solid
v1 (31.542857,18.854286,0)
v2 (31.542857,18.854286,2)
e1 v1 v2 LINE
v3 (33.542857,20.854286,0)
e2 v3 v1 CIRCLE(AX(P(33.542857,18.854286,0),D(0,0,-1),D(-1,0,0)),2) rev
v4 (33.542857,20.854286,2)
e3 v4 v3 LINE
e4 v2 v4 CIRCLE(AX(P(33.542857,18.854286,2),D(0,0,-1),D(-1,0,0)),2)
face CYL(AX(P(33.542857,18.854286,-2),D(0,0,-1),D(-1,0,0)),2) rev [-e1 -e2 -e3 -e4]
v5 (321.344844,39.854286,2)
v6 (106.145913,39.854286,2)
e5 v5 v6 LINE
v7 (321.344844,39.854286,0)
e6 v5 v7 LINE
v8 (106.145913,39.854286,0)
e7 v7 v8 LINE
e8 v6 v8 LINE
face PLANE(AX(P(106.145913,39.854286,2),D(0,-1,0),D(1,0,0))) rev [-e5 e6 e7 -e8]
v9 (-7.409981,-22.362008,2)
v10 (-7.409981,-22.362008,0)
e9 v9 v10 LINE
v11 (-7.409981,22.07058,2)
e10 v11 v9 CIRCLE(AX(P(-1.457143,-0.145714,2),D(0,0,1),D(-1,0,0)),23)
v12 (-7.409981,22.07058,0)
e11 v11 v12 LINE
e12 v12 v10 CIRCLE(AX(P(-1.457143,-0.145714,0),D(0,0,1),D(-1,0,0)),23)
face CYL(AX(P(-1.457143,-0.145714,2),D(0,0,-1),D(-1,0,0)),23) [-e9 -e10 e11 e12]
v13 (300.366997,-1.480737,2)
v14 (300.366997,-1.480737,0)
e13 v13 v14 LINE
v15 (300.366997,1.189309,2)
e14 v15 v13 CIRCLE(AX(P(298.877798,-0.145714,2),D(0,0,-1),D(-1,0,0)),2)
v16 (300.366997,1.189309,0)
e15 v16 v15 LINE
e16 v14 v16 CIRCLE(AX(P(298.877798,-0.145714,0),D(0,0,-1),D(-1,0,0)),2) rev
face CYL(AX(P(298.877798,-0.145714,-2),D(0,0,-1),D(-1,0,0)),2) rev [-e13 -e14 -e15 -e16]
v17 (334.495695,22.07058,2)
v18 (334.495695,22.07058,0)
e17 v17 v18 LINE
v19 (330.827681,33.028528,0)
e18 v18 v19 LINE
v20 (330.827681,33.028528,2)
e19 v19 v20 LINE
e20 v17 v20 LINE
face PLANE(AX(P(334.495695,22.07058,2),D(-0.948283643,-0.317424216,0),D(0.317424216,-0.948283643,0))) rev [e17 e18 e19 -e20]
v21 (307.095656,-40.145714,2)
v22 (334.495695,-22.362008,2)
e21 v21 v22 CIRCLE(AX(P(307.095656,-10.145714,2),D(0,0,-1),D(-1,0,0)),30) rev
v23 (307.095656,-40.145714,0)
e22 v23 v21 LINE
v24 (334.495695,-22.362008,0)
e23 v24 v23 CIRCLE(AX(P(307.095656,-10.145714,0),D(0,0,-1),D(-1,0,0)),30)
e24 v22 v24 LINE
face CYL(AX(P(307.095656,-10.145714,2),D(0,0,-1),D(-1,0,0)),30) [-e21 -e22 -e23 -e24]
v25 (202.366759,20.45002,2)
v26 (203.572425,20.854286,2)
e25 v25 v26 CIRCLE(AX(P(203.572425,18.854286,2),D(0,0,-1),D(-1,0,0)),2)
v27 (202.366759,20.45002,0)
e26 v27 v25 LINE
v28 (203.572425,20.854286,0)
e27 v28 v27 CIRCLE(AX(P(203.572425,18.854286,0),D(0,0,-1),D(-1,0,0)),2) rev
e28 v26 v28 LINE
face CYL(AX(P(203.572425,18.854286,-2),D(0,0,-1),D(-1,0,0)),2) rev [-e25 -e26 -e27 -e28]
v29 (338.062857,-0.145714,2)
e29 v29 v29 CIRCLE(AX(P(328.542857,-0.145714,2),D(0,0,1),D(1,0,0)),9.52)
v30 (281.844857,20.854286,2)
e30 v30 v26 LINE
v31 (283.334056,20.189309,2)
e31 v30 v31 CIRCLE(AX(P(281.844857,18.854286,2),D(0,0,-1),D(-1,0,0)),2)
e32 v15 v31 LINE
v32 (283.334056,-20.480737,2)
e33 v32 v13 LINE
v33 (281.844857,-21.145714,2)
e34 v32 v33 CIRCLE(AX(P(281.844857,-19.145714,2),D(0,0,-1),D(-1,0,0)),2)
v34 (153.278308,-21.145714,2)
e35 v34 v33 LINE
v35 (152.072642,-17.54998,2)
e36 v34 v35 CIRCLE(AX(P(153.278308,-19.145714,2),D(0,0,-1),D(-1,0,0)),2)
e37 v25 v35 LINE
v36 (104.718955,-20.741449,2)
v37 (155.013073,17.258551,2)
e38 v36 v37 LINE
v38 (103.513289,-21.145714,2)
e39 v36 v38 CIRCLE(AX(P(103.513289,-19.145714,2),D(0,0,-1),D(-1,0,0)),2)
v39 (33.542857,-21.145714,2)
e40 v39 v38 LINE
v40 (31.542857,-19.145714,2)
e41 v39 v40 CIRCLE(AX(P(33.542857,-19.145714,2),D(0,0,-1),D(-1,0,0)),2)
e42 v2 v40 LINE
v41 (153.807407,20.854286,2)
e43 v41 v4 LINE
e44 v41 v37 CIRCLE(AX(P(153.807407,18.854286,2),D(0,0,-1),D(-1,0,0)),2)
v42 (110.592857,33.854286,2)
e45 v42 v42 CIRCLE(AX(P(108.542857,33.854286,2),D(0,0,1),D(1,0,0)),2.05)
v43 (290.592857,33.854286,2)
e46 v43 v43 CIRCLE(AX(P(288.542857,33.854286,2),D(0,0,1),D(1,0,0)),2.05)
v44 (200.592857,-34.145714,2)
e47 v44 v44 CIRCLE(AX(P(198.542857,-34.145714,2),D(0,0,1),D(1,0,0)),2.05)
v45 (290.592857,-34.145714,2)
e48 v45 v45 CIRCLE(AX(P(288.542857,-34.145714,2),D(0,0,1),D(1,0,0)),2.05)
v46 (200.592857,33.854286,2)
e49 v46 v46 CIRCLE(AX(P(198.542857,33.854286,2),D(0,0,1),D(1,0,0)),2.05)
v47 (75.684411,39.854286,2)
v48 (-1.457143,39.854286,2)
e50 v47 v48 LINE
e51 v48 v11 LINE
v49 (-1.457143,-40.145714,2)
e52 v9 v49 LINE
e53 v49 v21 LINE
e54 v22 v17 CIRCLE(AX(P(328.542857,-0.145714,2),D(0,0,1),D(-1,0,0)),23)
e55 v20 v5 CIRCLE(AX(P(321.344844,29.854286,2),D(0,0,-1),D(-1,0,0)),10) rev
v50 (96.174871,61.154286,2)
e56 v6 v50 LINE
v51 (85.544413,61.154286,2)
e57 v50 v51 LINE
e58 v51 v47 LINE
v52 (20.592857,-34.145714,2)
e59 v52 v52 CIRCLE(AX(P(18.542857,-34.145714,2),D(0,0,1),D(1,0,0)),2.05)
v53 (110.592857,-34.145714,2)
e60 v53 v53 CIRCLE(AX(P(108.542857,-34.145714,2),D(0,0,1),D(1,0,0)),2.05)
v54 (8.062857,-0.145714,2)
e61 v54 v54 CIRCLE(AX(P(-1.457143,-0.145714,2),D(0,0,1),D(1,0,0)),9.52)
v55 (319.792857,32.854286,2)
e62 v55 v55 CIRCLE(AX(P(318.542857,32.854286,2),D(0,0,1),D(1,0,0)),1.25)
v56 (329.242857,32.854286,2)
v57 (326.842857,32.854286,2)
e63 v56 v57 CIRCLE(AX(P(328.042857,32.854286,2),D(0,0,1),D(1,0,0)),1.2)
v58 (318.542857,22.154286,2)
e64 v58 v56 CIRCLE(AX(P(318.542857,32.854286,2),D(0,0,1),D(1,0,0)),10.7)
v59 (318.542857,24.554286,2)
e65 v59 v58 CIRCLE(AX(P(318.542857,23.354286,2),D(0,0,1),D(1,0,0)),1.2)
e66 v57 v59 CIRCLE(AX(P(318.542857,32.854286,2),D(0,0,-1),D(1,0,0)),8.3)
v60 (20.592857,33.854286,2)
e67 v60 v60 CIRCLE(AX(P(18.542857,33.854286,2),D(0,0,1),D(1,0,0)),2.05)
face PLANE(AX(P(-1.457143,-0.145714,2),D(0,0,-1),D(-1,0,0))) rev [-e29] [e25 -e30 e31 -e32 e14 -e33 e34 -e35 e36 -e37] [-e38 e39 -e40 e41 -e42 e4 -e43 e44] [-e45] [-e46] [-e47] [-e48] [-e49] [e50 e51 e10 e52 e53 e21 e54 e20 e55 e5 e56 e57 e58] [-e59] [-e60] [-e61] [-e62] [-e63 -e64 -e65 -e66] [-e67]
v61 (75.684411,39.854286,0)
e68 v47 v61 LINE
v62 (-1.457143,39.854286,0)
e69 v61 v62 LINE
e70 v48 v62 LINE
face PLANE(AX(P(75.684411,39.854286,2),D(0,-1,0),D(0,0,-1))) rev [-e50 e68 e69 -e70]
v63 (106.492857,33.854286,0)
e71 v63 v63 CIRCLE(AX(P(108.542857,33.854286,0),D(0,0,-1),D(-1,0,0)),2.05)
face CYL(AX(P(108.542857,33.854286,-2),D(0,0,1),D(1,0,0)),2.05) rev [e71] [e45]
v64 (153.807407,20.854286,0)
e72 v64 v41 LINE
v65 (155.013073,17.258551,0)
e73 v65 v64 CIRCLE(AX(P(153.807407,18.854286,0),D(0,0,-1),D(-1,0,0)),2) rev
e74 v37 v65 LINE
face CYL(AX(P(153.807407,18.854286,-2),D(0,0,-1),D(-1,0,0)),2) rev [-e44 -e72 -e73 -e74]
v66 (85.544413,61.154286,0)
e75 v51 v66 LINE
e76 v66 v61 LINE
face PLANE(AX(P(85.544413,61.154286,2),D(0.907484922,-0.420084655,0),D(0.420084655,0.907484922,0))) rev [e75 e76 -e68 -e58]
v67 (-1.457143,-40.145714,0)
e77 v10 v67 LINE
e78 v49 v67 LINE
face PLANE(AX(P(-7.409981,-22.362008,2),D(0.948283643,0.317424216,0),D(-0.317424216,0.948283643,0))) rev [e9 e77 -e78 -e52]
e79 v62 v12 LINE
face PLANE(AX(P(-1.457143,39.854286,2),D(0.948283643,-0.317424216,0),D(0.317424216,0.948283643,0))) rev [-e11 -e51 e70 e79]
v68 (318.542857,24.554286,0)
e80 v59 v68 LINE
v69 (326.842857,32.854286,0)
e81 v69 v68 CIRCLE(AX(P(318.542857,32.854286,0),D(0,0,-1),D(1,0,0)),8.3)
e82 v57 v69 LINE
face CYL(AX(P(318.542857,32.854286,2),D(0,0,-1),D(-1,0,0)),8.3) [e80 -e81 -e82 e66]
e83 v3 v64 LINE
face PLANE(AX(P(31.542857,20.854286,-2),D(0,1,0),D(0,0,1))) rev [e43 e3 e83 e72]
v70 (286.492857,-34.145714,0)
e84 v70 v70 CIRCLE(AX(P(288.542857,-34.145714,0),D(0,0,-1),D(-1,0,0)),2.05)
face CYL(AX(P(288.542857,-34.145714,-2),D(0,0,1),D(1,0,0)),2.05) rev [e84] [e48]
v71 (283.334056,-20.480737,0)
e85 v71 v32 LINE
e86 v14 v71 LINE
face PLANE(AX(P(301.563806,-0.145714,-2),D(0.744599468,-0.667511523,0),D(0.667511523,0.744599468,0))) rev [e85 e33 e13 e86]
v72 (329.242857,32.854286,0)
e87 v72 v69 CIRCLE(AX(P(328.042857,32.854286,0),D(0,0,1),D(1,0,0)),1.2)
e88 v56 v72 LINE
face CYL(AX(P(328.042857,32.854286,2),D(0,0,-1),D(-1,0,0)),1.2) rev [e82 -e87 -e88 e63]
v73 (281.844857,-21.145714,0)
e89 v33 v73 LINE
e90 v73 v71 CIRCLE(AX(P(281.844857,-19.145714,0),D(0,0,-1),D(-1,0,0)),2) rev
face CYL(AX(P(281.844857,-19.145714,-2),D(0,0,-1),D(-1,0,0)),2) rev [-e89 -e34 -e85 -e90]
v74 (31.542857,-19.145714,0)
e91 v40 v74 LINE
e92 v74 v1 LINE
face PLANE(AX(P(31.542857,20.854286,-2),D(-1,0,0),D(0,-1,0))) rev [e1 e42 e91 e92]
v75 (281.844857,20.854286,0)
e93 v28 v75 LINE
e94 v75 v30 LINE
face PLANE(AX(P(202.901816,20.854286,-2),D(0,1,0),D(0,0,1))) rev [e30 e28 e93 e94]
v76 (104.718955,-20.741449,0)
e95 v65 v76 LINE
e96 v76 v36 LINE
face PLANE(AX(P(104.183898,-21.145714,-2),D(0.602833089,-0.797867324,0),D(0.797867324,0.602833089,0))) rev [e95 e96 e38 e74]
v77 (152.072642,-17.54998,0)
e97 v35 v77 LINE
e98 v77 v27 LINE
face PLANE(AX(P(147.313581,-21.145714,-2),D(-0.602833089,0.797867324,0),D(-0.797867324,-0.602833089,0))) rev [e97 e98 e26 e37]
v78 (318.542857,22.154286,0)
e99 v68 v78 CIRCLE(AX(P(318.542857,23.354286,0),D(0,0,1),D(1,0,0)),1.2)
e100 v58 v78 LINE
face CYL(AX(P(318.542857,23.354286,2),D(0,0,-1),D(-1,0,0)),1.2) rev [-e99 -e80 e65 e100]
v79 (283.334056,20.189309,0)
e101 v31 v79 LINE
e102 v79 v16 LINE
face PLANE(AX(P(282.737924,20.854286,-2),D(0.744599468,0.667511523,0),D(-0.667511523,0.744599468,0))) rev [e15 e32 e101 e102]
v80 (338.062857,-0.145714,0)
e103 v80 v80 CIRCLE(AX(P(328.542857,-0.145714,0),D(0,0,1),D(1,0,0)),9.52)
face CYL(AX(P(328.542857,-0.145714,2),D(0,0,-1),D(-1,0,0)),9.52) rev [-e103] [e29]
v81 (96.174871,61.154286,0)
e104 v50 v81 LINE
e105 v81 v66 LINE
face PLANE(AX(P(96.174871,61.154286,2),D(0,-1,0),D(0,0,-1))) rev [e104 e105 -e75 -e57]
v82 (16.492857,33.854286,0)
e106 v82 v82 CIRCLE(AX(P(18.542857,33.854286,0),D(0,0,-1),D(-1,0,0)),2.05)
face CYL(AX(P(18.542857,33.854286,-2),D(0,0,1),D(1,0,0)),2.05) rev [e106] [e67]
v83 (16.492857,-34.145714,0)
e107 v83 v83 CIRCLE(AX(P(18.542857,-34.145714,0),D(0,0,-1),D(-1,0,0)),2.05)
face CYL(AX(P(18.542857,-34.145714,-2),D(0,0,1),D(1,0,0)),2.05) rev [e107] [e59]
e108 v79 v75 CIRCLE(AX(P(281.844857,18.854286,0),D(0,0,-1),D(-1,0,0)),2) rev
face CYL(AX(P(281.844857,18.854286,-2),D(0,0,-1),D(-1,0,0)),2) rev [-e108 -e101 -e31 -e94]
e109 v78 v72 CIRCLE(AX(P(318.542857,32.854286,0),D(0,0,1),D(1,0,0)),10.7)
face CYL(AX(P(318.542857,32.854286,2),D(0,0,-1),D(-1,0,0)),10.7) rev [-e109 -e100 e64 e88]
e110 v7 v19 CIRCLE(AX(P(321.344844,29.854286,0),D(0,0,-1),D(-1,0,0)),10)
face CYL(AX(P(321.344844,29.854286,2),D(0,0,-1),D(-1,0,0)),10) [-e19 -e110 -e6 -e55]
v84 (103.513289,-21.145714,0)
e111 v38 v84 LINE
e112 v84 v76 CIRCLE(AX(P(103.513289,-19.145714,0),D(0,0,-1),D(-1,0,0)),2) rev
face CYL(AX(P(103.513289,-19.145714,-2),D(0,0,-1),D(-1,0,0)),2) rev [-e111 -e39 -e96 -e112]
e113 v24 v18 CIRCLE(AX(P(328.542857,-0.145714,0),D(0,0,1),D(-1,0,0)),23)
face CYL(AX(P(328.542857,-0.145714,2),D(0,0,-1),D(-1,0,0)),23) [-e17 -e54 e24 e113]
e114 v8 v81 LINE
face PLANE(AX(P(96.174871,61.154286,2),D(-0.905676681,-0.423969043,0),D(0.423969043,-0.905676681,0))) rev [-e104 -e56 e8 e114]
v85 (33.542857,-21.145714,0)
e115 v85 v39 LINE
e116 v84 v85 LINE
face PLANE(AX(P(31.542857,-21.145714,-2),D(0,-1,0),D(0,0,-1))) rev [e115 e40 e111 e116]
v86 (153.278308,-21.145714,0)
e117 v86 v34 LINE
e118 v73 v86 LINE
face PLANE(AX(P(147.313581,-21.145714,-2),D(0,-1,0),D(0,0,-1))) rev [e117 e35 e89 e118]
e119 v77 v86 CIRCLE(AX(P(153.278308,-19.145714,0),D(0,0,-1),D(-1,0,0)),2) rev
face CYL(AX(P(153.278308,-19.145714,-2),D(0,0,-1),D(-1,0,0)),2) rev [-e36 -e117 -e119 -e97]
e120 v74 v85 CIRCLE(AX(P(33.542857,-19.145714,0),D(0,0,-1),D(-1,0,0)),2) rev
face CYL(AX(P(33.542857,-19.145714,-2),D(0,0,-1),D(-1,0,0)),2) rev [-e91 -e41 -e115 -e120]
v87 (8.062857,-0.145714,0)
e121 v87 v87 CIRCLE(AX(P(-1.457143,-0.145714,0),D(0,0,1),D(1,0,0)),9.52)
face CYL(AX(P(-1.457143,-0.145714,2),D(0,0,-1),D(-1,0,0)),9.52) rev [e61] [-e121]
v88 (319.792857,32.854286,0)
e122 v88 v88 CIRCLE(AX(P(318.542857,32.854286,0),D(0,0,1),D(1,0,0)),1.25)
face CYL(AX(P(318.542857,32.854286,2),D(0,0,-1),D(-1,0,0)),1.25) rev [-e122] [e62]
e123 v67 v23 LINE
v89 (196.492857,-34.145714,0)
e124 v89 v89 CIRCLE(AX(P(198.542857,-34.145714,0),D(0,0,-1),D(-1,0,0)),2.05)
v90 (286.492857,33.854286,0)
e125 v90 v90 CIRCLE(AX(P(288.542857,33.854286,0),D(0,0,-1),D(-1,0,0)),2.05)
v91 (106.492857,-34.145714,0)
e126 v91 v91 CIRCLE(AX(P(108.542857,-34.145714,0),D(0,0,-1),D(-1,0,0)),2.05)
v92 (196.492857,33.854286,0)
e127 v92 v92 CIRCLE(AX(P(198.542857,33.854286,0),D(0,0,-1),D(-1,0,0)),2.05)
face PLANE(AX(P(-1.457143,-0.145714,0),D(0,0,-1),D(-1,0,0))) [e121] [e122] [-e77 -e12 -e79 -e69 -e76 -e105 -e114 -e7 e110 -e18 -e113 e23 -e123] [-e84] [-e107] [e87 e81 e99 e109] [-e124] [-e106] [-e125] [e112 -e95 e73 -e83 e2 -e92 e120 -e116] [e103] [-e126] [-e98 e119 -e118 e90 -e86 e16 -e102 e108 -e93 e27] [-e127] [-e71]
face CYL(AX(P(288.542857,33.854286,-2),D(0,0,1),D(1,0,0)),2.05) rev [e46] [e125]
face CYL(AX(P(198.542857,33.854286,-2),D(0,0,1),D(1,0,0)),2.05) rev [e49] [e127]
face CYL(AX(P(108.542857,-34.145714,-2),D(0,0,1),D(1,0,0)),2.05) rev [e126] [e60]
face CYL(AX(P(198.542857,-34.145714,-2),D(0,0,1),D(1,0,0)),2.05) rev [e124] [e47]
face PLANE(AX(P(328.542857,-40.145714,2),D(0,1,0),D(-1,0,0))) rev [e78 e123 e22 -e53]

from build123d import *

# Parameters (mm, degrees)
SKETCH_1_R          = 9.52
SKETCH_1_R_2        = 1.25
EXTRUDE_1_DEPTH     = 2
SKETCH_2_R          = 2.05
CUT_EXTRUDE_1_DEPTH = 4
FILLET_1_R          = 2
FILLET_3_R          = 30
FILLET_6_R          = 10


with BuildPart() as part:
    # 草图1 → 凸台-拉伸1 (new body)
    with BuildSketch(Plane.XY):
        with BuildLine():
            Line((328.542857143, -40.145714286), (-1.457142857, -40.145714286))
            Line((-1.457142857, -40.145714286), (-7.409980895, -22.36200829))
            ThreePointArc((-7.409980895, -22.36200829), (-24.457142857, -0.145714286), (-7.409980895, 22.070579719))
            Line((-7.409980895, 22.070579719), (-1.457142857, 39.854285714))
            Line((-1.457142857, 39.854285714), (75.684411109, 39.854285714))
            Line((75.684411109, 39.854285714), (85.544413109, 61.154285714))
            Line((85.544413109, 61.154285714), (96.174870529, 61.154285714))
            Line((96.174870529, 61.154285714), (106.145912956, 39.854285714))
            Line((106.145912956, 39.854285714), (321.071621128, 39.854285714))
            Line((321.071621128, 39.854285714), (328.542857143, 39.854285714))
            Line((328.542857143, 39.854285714), (334.49569518, 22.070579719))
            ThreePointArc((334.49569518, 22.070579719), (351.542857143, -0.145714286), (334.49569518, -22.36200829))
            Line((334.49569518, -22.36200829), (328.542857143, -40.145714286))
        make_face()
        with Locations((-1.457142857, -0.145714286)):
            Circle(SKETCH_1_R, mode=Mode.SUBTRACT)
        with Locations((328.542857143, -0.145714286)):
            Circle(SKETCH_1_R, mode=Mode.SUBTRACT)
        with Locations((318.542857143, 32.854285714)):
            Circle(SKETCH_1_R_2, mode=Mode.SUBTRACT)
        with BuildLine():
            ThreePointArc((318.542857143, 22.154285714), (326.108899702, 25.288243156), (329.242857143, 32.854285714))
            ThreePointArc((329.242857143, 32.854285714), (328.042857143, 34.054285714), (326.842857143, 32.854285714))
            ThreePointArc((326.842857143, 32.854285714), (324.411843427, 26.98529943), (318.542857143, 24.554285714))
            ThreePointArc((318.542857143, 24.554285714), (317.342857143, 23.354285714), (318.542857143, 22.154285714))
        make_face(mode=Mode.SUBTRACT)
    extrude(amount=EXTRUDE_1_DEPTH)

    # 草图2 → 切除-拉伸1 (cut)
    with BuildSketch(Plane.XY.offset(2)):
        with Locations((108.542857143, 33.854285714)):
            Circle(SKETCH_2_R)
        with Locations((198.542857143, 33.854285714)):
            Circle(SKETCH_2_R)
        with Locations((288.542857143, 33.854285714)):
            Circle(SKETCH_2_R)
        with Locations((108.542857143, -34.145714286)):
            Circle(SKETCH_2_R)
        with Locations((198.542857143, -34.145714286)):
            Circle(SKETCH_2_R)
        with Locations((288.542857143, -34.145714286)):
            Circle(SKETCH_2_R)
        with Locations((18.542857143, -34.145714286)):
            Circle(SKETCH_2_R)
        with Locations((18.542857143, 33.854285714)):
            Circle(SKETCH_2_R)
        Polygon((31.542857143, -21.145714286), (104.183898028, -21.145714286), (159.772133322, 20.854285714), (31.542857143, 20.854285714), align=None)
        Polygon((147.313580964, -21.145714286), (202.901816258, 20.854285714), (282.737923896, 20.854285714), (301.563806249, -0.145714286), (282.737923896, -21.145714286), align=None)
    extrude(amount=-CUT_EXTRUDE_1_DEPTH, mode=Mode.SUBTRACT)

    # 圆角1
    fillet_1_edges = [part.edges().sort_by_distance(p)[0] for p in [
        (202.901816258, 20.854285714, 1),
        (282.737923896, 20.854285714, 1),
        (301.563806249, -0.145714286, 1),
        (31.542857143, -21.145714286, 1),
        (31.542857143, 20.854285714, 1),
        (159.772133322, 20.854285714, 1),
        (104.183898028, -21.145714286, 1),
        (282.737923896, -21.145714286, 1),
        (147.313580964, -21.145714286, 1),
    ]]
    fillet(fillet_1_edges, radius=FILLET_1_R)

    # 圆角3
    # the kernel refuses this fillet: 30 mm, written as the material it takes off along each edge
    with BuildSketch(Plane(origin=(328.542857143, -40.145714286, -53.618003483), x_dir=(0.3174242162824087, 0.9482836426499714, 0), z_dir=(0, 0, 1))) as fillet_3_piece_1:
        with BuildLine():
            CenterArc((21.640648186, 29.86075675), FILLET_3_R, 198.507223716, 65.970321092)
            Line((-6.807861094, 20.338030262), (-7.376831279, 20.147575732))
            Line((-7.376831279, 20.147575732), (-0.568970186, -0.19045453))
            Line((-0.568970186, -0.19045453), (0, -0.6))
            ThreePointArc((0, -0.6), (9.376786225, -0.6), (18.695830935, -0.597215135))
            Line((18.695830935, -0.597215135), (18.75357245, 0))
        make_face()
    extrude(amount=109.236006966, mode=Mode.SUBTRACT)

    # 圆角6
    fillet_6_edges = [part.edges().sort_by_distance(p)[0] for p in [
        (328.542857143, 39.854285714, 1),
    ]]
    fillet(fillet_6_edges, radius=FILLET_6_R)


solid = part.part
